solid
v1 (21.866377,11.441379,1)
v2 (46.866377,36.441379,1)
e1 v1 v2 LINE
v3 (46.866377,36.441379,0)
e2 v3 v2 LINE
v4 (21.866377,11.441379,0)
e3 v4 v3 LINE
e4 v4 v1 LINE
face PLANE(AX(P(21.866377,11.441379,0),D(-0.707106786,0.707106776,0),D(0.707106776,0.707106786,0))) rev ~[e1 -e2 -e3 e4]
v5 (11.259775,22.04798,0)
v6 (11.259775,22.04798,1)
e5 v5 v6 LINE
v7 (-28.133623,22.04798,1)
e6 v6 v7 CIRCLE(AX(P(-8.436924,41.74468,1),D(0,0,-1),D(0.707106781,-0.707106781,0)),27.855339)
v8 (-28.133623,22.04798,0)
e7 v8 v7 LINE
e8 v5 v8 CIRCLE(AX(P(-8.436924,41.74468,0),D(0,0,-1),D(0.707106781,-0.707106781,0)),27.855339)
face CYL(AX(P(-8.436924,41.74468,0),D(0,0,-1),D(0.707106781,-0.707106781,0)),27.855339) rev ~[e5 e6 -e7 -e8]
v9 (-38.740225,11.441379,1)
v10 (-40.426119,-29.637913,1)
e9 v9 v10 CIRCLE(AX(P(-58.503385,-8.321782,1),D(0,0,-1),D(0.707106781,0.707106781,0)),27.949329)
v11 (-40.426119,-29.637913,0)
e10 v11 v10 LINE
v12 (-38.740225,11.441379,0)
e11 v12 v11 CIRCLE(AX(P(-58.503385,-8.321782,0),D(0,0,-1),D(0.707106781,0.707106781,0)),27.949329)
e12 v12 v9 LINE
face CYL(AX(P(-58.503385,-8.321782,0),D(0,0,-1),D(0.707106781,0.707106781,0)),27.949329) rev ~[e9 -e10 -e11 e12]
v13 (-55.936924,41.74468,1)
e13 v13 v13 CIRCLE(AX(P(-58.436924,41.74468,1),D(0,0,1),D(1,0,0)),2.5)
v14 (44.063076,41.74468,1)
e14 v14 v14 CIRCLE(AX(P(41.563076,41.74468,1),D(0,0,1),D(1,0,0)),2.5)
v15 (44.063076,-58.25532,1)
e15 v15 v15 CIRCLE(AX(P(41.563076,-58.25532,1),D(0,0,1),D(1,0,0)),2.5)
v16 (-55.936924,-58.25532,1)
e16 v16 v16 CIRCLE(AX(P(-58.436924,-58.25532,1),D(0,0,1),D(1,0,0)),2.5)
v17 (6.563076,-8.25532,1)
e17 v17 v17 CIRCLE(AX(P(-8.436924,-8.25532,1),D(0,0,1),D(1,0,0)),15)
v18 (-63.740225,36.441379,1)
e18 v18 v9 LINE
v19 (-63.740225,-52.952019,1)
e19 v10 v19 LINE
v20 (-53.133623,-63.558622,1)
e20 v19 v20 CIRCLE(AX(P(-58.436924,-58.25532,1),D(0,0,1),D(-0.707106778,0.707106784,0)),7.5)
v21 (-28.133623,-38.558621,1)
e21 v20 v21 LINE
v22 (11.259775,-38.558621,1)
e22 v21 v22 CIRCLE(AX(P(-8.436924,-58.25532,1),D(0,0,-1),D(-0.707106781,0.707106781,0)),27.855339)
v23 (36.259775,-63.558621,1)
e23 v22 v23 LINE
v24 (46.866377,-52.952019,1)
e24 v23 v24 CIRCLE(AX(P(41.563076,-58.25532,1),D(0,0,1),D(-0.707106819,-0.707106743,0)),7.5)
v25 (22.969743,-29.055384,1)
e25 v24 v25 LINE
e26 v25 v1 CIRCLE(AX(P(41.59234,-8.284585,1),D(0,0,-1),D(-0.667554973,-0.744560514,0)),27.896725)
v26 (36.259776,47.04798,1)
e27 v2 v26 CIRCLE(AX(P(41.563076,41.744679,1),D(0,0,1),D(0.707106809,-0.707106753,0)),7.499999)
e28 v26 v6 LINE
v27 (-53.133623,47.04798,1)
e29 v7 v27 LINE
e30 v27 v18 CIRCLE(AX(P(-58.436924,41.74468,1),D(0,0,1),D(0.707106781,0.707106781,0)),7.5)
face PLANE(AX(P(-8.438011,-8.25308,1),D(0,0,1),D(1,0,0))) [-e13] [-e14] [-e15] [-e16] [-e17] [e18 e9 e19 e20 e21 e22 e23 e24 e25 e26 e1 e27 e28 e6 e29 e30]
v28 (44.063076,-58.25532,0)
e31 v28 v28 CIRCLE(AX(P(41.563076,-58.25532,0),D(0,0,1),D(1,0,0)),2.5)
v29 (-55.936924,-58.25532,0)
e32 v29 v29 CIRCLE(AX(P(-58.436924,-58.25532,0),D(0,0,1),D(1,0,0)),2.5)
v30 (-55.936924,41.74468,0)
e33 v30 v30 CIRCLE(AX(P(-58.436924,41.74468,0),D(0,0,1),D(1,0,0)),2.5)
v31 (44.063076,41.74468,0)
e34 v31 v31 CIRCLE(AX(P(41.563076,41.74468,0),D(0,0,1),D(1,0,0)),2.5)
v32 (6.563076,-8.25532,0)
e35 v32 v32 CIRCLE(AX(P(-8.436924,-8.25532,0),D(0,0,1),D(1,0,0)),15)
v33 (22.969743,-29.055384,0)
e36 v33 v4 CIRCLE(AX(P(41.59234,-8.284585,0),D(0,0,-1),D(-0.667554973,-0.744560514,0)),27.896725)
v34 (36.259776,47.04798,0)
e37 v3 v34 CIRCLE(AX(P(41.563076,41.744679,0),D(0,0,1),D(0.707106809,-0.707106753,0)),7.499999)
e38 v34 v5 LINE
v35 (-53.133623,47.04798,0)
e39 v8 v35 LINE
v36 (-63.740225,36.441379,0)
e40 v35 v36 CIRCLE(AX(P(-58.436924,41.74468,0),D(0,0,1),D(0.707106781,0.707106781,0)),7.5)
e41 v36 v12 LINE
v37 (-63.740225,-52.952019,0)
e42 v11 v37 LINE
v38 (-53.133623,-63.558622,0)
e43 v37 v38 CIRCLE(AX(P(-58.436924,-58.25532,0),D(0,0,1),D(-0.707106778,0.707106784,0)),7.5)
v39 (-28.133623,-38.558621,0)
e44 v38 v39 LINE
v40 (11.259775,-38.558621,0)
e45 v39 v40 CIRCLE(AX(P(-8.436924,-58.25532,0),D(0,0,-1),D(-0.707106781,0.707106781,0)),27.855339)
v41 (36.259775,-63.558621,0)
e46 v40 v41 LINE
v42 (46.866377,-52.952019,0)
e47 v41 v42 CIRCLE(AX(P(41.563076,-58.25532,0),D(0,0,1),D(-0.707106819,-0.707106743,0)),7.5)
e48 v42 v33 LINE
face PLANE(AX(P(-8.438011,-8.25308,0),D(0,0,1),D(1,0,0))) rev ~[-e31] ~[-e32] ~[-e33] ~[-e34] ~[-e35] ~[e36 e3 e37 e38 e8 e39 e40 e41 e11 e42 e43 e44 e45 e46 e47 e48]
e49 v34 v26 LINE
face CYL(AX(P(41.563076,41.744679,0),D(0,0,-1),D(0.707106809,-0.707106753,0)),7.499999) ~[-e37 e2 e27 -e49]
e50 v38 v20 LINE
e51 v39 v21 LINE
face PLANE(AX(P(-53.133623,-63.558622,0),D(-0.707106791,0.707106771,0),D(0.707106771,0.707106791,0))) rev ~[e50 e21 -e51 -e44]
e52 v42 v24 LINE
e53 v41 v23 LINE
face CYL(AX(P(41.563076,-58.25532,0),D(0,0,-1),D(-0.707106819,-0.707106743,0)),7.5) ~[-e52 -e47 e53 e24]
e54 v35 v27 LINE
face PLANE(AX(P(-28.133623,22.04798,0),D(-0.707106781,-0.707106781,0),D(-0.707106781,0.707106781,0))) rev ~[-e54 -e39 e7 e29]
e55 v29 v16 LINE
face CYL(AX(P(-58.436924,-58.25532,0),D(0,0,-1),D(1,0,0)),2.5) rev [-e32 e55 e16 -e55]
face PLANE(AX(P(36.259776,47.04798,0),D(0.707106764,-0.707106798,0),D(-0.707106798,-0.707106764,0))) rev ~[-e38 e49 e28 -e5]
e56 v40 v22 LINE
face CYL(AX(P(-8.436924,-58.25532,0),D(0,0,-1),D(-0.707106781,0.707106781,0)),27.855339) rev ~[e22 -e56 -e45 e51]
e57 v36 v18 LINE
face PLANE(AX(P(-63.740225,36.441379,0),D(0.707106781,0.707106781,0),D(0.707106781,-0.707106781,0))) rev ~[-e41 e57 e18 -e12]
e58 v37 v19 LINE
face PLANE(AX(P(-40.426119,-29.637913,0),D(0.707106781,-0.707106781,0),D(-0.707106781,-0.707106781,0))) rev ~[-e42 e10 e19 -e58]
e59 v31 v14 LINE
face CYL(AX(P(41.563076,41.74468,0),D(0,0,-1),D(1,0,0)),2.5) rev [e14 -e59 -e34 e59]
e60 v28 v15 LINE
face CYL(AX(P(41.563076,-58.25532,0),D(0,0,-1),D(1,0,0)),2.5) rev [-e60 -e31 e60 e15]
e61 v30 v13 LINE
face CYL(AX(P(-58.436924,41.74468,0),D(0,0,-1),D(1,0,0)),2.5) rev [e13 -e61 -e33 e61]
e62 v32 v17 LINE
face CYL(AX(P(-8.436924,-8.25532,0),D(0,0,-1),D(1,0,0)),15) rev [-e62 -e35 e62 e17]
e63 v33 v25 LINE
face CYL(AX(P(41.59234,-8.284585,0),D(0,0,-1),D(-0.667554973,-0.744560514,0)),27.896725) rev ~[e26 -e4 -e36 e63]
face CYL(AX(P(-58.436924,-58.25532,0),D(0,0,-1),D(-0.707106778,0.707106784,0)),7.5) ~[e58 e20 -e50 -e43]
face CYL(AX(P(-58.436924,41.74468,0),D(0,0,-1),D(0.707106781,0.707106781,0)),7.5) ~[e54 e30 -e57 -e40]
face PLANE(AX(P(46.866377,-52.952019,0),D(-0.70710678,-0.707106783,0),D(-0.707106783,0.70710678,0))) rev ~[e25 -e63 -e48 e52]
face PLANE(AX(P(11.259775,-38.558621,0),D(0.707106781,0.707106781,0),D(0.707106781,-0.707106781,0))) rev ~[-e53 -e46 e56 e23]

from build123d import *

# Parameters (mm, degrees)
F0_R     = 2.5
F0_R_2   = 15
F1_DEPTH = 1


# Not quite as in the source:
# - ends of sketch curves that miss each other by under 0.0002 mm in the source are joined


with BuildPart() as f1:
    # F0 (on Top) → F1 (new body)
    with BuildSketch(Plane.XY):
        with BuildLine():
            ThreePointArc((11.259775071, 22.0479804919), (-8.4369240701, 13.8893405737), (-28.1336232112, 22.0479804919))
            Line((-28.1336232112, 22.0479804919), (-53.1336232112, 47.0479804919))
            ThreePointArc((-53.1336232112, 47.0479804919), (-63.740224929, 47.0479804919), (-63.740224929, 36.4413787741))
            Line((-63.740224929, 36.4413787741), (-38.740224929, 11.4413787741))
            ThreePointArc((-38.740224929, 11.4413787741), (-30.5775634521, -9.4678572948), (-40.4261190382, -29.6379130271))
            Line((-40.4261190382, -29.6379130271), (-63.7402252241, -52.952019213))
            ThreePointArc((-63.7402252241, -52.952019213), (-63.740225272, -63.5586215688), (-53.1336228682, -63.5586215688))
            Line((-53.1336228682, -63.5586215688), (-28.1336232112, -38.5586212259))
            ThreePointArc((-28.1336232112, -38.5586212259), (-8.4369240701, -30.3999813076), (11.259775071, -38.5586212259))
            Line((11.259775071, -38.5586212259), (36.259775071, -63.5586212259))
            ThreePointArc((36.259775071, -63.5586212259), (46.8663773553, -63.5586217924), (46.8663773553, -52.9520189415))
            Line((46.8663773553, -52.9520189415), (22.9697427144, -29.0553843966))
            ThreePointArc((22.9697427144, -29.0553843966), (13.7059638015, -9.0443706663), (21.8663767888, 11.4413787741))
            Line((21.8663767888, 11.4413787741), (46.8663766102, 36.4413789527))
            ThreePointArc((46.8663766102, 36.4413789527), (46.8663761898, 47.0479798929), (36.25977567, 47.0479798929))
            Line((36.25977567, 47.0479798929), (11.259775071, 22.0479804919))
        make_face()
        with Locations((-58.4369240701, -58.255320367)):
            Circle(F0_R, mode=Mode.SUBTRACT)
        with Locations((41.5630759299, -58.255320367)):
            Circle(F0_R, mode=Mode.SUBTRACT)
        with Locations((-8.4369240701, -8.255320367)):
            Circle(F0_R_2, mode=Mode.SUBTRACT)
        with Locations((-58.4369240701, 41.744679633)):
            Circle(F0_R, mode=Mode.SUBTRACT)
        with Locations((41.5630759299, 41.744679633)):
            Circle(F0_R, mode=Mode.SUBTRACT)
    extrude(amount=F1_DEPTH)


solid = f1.part
